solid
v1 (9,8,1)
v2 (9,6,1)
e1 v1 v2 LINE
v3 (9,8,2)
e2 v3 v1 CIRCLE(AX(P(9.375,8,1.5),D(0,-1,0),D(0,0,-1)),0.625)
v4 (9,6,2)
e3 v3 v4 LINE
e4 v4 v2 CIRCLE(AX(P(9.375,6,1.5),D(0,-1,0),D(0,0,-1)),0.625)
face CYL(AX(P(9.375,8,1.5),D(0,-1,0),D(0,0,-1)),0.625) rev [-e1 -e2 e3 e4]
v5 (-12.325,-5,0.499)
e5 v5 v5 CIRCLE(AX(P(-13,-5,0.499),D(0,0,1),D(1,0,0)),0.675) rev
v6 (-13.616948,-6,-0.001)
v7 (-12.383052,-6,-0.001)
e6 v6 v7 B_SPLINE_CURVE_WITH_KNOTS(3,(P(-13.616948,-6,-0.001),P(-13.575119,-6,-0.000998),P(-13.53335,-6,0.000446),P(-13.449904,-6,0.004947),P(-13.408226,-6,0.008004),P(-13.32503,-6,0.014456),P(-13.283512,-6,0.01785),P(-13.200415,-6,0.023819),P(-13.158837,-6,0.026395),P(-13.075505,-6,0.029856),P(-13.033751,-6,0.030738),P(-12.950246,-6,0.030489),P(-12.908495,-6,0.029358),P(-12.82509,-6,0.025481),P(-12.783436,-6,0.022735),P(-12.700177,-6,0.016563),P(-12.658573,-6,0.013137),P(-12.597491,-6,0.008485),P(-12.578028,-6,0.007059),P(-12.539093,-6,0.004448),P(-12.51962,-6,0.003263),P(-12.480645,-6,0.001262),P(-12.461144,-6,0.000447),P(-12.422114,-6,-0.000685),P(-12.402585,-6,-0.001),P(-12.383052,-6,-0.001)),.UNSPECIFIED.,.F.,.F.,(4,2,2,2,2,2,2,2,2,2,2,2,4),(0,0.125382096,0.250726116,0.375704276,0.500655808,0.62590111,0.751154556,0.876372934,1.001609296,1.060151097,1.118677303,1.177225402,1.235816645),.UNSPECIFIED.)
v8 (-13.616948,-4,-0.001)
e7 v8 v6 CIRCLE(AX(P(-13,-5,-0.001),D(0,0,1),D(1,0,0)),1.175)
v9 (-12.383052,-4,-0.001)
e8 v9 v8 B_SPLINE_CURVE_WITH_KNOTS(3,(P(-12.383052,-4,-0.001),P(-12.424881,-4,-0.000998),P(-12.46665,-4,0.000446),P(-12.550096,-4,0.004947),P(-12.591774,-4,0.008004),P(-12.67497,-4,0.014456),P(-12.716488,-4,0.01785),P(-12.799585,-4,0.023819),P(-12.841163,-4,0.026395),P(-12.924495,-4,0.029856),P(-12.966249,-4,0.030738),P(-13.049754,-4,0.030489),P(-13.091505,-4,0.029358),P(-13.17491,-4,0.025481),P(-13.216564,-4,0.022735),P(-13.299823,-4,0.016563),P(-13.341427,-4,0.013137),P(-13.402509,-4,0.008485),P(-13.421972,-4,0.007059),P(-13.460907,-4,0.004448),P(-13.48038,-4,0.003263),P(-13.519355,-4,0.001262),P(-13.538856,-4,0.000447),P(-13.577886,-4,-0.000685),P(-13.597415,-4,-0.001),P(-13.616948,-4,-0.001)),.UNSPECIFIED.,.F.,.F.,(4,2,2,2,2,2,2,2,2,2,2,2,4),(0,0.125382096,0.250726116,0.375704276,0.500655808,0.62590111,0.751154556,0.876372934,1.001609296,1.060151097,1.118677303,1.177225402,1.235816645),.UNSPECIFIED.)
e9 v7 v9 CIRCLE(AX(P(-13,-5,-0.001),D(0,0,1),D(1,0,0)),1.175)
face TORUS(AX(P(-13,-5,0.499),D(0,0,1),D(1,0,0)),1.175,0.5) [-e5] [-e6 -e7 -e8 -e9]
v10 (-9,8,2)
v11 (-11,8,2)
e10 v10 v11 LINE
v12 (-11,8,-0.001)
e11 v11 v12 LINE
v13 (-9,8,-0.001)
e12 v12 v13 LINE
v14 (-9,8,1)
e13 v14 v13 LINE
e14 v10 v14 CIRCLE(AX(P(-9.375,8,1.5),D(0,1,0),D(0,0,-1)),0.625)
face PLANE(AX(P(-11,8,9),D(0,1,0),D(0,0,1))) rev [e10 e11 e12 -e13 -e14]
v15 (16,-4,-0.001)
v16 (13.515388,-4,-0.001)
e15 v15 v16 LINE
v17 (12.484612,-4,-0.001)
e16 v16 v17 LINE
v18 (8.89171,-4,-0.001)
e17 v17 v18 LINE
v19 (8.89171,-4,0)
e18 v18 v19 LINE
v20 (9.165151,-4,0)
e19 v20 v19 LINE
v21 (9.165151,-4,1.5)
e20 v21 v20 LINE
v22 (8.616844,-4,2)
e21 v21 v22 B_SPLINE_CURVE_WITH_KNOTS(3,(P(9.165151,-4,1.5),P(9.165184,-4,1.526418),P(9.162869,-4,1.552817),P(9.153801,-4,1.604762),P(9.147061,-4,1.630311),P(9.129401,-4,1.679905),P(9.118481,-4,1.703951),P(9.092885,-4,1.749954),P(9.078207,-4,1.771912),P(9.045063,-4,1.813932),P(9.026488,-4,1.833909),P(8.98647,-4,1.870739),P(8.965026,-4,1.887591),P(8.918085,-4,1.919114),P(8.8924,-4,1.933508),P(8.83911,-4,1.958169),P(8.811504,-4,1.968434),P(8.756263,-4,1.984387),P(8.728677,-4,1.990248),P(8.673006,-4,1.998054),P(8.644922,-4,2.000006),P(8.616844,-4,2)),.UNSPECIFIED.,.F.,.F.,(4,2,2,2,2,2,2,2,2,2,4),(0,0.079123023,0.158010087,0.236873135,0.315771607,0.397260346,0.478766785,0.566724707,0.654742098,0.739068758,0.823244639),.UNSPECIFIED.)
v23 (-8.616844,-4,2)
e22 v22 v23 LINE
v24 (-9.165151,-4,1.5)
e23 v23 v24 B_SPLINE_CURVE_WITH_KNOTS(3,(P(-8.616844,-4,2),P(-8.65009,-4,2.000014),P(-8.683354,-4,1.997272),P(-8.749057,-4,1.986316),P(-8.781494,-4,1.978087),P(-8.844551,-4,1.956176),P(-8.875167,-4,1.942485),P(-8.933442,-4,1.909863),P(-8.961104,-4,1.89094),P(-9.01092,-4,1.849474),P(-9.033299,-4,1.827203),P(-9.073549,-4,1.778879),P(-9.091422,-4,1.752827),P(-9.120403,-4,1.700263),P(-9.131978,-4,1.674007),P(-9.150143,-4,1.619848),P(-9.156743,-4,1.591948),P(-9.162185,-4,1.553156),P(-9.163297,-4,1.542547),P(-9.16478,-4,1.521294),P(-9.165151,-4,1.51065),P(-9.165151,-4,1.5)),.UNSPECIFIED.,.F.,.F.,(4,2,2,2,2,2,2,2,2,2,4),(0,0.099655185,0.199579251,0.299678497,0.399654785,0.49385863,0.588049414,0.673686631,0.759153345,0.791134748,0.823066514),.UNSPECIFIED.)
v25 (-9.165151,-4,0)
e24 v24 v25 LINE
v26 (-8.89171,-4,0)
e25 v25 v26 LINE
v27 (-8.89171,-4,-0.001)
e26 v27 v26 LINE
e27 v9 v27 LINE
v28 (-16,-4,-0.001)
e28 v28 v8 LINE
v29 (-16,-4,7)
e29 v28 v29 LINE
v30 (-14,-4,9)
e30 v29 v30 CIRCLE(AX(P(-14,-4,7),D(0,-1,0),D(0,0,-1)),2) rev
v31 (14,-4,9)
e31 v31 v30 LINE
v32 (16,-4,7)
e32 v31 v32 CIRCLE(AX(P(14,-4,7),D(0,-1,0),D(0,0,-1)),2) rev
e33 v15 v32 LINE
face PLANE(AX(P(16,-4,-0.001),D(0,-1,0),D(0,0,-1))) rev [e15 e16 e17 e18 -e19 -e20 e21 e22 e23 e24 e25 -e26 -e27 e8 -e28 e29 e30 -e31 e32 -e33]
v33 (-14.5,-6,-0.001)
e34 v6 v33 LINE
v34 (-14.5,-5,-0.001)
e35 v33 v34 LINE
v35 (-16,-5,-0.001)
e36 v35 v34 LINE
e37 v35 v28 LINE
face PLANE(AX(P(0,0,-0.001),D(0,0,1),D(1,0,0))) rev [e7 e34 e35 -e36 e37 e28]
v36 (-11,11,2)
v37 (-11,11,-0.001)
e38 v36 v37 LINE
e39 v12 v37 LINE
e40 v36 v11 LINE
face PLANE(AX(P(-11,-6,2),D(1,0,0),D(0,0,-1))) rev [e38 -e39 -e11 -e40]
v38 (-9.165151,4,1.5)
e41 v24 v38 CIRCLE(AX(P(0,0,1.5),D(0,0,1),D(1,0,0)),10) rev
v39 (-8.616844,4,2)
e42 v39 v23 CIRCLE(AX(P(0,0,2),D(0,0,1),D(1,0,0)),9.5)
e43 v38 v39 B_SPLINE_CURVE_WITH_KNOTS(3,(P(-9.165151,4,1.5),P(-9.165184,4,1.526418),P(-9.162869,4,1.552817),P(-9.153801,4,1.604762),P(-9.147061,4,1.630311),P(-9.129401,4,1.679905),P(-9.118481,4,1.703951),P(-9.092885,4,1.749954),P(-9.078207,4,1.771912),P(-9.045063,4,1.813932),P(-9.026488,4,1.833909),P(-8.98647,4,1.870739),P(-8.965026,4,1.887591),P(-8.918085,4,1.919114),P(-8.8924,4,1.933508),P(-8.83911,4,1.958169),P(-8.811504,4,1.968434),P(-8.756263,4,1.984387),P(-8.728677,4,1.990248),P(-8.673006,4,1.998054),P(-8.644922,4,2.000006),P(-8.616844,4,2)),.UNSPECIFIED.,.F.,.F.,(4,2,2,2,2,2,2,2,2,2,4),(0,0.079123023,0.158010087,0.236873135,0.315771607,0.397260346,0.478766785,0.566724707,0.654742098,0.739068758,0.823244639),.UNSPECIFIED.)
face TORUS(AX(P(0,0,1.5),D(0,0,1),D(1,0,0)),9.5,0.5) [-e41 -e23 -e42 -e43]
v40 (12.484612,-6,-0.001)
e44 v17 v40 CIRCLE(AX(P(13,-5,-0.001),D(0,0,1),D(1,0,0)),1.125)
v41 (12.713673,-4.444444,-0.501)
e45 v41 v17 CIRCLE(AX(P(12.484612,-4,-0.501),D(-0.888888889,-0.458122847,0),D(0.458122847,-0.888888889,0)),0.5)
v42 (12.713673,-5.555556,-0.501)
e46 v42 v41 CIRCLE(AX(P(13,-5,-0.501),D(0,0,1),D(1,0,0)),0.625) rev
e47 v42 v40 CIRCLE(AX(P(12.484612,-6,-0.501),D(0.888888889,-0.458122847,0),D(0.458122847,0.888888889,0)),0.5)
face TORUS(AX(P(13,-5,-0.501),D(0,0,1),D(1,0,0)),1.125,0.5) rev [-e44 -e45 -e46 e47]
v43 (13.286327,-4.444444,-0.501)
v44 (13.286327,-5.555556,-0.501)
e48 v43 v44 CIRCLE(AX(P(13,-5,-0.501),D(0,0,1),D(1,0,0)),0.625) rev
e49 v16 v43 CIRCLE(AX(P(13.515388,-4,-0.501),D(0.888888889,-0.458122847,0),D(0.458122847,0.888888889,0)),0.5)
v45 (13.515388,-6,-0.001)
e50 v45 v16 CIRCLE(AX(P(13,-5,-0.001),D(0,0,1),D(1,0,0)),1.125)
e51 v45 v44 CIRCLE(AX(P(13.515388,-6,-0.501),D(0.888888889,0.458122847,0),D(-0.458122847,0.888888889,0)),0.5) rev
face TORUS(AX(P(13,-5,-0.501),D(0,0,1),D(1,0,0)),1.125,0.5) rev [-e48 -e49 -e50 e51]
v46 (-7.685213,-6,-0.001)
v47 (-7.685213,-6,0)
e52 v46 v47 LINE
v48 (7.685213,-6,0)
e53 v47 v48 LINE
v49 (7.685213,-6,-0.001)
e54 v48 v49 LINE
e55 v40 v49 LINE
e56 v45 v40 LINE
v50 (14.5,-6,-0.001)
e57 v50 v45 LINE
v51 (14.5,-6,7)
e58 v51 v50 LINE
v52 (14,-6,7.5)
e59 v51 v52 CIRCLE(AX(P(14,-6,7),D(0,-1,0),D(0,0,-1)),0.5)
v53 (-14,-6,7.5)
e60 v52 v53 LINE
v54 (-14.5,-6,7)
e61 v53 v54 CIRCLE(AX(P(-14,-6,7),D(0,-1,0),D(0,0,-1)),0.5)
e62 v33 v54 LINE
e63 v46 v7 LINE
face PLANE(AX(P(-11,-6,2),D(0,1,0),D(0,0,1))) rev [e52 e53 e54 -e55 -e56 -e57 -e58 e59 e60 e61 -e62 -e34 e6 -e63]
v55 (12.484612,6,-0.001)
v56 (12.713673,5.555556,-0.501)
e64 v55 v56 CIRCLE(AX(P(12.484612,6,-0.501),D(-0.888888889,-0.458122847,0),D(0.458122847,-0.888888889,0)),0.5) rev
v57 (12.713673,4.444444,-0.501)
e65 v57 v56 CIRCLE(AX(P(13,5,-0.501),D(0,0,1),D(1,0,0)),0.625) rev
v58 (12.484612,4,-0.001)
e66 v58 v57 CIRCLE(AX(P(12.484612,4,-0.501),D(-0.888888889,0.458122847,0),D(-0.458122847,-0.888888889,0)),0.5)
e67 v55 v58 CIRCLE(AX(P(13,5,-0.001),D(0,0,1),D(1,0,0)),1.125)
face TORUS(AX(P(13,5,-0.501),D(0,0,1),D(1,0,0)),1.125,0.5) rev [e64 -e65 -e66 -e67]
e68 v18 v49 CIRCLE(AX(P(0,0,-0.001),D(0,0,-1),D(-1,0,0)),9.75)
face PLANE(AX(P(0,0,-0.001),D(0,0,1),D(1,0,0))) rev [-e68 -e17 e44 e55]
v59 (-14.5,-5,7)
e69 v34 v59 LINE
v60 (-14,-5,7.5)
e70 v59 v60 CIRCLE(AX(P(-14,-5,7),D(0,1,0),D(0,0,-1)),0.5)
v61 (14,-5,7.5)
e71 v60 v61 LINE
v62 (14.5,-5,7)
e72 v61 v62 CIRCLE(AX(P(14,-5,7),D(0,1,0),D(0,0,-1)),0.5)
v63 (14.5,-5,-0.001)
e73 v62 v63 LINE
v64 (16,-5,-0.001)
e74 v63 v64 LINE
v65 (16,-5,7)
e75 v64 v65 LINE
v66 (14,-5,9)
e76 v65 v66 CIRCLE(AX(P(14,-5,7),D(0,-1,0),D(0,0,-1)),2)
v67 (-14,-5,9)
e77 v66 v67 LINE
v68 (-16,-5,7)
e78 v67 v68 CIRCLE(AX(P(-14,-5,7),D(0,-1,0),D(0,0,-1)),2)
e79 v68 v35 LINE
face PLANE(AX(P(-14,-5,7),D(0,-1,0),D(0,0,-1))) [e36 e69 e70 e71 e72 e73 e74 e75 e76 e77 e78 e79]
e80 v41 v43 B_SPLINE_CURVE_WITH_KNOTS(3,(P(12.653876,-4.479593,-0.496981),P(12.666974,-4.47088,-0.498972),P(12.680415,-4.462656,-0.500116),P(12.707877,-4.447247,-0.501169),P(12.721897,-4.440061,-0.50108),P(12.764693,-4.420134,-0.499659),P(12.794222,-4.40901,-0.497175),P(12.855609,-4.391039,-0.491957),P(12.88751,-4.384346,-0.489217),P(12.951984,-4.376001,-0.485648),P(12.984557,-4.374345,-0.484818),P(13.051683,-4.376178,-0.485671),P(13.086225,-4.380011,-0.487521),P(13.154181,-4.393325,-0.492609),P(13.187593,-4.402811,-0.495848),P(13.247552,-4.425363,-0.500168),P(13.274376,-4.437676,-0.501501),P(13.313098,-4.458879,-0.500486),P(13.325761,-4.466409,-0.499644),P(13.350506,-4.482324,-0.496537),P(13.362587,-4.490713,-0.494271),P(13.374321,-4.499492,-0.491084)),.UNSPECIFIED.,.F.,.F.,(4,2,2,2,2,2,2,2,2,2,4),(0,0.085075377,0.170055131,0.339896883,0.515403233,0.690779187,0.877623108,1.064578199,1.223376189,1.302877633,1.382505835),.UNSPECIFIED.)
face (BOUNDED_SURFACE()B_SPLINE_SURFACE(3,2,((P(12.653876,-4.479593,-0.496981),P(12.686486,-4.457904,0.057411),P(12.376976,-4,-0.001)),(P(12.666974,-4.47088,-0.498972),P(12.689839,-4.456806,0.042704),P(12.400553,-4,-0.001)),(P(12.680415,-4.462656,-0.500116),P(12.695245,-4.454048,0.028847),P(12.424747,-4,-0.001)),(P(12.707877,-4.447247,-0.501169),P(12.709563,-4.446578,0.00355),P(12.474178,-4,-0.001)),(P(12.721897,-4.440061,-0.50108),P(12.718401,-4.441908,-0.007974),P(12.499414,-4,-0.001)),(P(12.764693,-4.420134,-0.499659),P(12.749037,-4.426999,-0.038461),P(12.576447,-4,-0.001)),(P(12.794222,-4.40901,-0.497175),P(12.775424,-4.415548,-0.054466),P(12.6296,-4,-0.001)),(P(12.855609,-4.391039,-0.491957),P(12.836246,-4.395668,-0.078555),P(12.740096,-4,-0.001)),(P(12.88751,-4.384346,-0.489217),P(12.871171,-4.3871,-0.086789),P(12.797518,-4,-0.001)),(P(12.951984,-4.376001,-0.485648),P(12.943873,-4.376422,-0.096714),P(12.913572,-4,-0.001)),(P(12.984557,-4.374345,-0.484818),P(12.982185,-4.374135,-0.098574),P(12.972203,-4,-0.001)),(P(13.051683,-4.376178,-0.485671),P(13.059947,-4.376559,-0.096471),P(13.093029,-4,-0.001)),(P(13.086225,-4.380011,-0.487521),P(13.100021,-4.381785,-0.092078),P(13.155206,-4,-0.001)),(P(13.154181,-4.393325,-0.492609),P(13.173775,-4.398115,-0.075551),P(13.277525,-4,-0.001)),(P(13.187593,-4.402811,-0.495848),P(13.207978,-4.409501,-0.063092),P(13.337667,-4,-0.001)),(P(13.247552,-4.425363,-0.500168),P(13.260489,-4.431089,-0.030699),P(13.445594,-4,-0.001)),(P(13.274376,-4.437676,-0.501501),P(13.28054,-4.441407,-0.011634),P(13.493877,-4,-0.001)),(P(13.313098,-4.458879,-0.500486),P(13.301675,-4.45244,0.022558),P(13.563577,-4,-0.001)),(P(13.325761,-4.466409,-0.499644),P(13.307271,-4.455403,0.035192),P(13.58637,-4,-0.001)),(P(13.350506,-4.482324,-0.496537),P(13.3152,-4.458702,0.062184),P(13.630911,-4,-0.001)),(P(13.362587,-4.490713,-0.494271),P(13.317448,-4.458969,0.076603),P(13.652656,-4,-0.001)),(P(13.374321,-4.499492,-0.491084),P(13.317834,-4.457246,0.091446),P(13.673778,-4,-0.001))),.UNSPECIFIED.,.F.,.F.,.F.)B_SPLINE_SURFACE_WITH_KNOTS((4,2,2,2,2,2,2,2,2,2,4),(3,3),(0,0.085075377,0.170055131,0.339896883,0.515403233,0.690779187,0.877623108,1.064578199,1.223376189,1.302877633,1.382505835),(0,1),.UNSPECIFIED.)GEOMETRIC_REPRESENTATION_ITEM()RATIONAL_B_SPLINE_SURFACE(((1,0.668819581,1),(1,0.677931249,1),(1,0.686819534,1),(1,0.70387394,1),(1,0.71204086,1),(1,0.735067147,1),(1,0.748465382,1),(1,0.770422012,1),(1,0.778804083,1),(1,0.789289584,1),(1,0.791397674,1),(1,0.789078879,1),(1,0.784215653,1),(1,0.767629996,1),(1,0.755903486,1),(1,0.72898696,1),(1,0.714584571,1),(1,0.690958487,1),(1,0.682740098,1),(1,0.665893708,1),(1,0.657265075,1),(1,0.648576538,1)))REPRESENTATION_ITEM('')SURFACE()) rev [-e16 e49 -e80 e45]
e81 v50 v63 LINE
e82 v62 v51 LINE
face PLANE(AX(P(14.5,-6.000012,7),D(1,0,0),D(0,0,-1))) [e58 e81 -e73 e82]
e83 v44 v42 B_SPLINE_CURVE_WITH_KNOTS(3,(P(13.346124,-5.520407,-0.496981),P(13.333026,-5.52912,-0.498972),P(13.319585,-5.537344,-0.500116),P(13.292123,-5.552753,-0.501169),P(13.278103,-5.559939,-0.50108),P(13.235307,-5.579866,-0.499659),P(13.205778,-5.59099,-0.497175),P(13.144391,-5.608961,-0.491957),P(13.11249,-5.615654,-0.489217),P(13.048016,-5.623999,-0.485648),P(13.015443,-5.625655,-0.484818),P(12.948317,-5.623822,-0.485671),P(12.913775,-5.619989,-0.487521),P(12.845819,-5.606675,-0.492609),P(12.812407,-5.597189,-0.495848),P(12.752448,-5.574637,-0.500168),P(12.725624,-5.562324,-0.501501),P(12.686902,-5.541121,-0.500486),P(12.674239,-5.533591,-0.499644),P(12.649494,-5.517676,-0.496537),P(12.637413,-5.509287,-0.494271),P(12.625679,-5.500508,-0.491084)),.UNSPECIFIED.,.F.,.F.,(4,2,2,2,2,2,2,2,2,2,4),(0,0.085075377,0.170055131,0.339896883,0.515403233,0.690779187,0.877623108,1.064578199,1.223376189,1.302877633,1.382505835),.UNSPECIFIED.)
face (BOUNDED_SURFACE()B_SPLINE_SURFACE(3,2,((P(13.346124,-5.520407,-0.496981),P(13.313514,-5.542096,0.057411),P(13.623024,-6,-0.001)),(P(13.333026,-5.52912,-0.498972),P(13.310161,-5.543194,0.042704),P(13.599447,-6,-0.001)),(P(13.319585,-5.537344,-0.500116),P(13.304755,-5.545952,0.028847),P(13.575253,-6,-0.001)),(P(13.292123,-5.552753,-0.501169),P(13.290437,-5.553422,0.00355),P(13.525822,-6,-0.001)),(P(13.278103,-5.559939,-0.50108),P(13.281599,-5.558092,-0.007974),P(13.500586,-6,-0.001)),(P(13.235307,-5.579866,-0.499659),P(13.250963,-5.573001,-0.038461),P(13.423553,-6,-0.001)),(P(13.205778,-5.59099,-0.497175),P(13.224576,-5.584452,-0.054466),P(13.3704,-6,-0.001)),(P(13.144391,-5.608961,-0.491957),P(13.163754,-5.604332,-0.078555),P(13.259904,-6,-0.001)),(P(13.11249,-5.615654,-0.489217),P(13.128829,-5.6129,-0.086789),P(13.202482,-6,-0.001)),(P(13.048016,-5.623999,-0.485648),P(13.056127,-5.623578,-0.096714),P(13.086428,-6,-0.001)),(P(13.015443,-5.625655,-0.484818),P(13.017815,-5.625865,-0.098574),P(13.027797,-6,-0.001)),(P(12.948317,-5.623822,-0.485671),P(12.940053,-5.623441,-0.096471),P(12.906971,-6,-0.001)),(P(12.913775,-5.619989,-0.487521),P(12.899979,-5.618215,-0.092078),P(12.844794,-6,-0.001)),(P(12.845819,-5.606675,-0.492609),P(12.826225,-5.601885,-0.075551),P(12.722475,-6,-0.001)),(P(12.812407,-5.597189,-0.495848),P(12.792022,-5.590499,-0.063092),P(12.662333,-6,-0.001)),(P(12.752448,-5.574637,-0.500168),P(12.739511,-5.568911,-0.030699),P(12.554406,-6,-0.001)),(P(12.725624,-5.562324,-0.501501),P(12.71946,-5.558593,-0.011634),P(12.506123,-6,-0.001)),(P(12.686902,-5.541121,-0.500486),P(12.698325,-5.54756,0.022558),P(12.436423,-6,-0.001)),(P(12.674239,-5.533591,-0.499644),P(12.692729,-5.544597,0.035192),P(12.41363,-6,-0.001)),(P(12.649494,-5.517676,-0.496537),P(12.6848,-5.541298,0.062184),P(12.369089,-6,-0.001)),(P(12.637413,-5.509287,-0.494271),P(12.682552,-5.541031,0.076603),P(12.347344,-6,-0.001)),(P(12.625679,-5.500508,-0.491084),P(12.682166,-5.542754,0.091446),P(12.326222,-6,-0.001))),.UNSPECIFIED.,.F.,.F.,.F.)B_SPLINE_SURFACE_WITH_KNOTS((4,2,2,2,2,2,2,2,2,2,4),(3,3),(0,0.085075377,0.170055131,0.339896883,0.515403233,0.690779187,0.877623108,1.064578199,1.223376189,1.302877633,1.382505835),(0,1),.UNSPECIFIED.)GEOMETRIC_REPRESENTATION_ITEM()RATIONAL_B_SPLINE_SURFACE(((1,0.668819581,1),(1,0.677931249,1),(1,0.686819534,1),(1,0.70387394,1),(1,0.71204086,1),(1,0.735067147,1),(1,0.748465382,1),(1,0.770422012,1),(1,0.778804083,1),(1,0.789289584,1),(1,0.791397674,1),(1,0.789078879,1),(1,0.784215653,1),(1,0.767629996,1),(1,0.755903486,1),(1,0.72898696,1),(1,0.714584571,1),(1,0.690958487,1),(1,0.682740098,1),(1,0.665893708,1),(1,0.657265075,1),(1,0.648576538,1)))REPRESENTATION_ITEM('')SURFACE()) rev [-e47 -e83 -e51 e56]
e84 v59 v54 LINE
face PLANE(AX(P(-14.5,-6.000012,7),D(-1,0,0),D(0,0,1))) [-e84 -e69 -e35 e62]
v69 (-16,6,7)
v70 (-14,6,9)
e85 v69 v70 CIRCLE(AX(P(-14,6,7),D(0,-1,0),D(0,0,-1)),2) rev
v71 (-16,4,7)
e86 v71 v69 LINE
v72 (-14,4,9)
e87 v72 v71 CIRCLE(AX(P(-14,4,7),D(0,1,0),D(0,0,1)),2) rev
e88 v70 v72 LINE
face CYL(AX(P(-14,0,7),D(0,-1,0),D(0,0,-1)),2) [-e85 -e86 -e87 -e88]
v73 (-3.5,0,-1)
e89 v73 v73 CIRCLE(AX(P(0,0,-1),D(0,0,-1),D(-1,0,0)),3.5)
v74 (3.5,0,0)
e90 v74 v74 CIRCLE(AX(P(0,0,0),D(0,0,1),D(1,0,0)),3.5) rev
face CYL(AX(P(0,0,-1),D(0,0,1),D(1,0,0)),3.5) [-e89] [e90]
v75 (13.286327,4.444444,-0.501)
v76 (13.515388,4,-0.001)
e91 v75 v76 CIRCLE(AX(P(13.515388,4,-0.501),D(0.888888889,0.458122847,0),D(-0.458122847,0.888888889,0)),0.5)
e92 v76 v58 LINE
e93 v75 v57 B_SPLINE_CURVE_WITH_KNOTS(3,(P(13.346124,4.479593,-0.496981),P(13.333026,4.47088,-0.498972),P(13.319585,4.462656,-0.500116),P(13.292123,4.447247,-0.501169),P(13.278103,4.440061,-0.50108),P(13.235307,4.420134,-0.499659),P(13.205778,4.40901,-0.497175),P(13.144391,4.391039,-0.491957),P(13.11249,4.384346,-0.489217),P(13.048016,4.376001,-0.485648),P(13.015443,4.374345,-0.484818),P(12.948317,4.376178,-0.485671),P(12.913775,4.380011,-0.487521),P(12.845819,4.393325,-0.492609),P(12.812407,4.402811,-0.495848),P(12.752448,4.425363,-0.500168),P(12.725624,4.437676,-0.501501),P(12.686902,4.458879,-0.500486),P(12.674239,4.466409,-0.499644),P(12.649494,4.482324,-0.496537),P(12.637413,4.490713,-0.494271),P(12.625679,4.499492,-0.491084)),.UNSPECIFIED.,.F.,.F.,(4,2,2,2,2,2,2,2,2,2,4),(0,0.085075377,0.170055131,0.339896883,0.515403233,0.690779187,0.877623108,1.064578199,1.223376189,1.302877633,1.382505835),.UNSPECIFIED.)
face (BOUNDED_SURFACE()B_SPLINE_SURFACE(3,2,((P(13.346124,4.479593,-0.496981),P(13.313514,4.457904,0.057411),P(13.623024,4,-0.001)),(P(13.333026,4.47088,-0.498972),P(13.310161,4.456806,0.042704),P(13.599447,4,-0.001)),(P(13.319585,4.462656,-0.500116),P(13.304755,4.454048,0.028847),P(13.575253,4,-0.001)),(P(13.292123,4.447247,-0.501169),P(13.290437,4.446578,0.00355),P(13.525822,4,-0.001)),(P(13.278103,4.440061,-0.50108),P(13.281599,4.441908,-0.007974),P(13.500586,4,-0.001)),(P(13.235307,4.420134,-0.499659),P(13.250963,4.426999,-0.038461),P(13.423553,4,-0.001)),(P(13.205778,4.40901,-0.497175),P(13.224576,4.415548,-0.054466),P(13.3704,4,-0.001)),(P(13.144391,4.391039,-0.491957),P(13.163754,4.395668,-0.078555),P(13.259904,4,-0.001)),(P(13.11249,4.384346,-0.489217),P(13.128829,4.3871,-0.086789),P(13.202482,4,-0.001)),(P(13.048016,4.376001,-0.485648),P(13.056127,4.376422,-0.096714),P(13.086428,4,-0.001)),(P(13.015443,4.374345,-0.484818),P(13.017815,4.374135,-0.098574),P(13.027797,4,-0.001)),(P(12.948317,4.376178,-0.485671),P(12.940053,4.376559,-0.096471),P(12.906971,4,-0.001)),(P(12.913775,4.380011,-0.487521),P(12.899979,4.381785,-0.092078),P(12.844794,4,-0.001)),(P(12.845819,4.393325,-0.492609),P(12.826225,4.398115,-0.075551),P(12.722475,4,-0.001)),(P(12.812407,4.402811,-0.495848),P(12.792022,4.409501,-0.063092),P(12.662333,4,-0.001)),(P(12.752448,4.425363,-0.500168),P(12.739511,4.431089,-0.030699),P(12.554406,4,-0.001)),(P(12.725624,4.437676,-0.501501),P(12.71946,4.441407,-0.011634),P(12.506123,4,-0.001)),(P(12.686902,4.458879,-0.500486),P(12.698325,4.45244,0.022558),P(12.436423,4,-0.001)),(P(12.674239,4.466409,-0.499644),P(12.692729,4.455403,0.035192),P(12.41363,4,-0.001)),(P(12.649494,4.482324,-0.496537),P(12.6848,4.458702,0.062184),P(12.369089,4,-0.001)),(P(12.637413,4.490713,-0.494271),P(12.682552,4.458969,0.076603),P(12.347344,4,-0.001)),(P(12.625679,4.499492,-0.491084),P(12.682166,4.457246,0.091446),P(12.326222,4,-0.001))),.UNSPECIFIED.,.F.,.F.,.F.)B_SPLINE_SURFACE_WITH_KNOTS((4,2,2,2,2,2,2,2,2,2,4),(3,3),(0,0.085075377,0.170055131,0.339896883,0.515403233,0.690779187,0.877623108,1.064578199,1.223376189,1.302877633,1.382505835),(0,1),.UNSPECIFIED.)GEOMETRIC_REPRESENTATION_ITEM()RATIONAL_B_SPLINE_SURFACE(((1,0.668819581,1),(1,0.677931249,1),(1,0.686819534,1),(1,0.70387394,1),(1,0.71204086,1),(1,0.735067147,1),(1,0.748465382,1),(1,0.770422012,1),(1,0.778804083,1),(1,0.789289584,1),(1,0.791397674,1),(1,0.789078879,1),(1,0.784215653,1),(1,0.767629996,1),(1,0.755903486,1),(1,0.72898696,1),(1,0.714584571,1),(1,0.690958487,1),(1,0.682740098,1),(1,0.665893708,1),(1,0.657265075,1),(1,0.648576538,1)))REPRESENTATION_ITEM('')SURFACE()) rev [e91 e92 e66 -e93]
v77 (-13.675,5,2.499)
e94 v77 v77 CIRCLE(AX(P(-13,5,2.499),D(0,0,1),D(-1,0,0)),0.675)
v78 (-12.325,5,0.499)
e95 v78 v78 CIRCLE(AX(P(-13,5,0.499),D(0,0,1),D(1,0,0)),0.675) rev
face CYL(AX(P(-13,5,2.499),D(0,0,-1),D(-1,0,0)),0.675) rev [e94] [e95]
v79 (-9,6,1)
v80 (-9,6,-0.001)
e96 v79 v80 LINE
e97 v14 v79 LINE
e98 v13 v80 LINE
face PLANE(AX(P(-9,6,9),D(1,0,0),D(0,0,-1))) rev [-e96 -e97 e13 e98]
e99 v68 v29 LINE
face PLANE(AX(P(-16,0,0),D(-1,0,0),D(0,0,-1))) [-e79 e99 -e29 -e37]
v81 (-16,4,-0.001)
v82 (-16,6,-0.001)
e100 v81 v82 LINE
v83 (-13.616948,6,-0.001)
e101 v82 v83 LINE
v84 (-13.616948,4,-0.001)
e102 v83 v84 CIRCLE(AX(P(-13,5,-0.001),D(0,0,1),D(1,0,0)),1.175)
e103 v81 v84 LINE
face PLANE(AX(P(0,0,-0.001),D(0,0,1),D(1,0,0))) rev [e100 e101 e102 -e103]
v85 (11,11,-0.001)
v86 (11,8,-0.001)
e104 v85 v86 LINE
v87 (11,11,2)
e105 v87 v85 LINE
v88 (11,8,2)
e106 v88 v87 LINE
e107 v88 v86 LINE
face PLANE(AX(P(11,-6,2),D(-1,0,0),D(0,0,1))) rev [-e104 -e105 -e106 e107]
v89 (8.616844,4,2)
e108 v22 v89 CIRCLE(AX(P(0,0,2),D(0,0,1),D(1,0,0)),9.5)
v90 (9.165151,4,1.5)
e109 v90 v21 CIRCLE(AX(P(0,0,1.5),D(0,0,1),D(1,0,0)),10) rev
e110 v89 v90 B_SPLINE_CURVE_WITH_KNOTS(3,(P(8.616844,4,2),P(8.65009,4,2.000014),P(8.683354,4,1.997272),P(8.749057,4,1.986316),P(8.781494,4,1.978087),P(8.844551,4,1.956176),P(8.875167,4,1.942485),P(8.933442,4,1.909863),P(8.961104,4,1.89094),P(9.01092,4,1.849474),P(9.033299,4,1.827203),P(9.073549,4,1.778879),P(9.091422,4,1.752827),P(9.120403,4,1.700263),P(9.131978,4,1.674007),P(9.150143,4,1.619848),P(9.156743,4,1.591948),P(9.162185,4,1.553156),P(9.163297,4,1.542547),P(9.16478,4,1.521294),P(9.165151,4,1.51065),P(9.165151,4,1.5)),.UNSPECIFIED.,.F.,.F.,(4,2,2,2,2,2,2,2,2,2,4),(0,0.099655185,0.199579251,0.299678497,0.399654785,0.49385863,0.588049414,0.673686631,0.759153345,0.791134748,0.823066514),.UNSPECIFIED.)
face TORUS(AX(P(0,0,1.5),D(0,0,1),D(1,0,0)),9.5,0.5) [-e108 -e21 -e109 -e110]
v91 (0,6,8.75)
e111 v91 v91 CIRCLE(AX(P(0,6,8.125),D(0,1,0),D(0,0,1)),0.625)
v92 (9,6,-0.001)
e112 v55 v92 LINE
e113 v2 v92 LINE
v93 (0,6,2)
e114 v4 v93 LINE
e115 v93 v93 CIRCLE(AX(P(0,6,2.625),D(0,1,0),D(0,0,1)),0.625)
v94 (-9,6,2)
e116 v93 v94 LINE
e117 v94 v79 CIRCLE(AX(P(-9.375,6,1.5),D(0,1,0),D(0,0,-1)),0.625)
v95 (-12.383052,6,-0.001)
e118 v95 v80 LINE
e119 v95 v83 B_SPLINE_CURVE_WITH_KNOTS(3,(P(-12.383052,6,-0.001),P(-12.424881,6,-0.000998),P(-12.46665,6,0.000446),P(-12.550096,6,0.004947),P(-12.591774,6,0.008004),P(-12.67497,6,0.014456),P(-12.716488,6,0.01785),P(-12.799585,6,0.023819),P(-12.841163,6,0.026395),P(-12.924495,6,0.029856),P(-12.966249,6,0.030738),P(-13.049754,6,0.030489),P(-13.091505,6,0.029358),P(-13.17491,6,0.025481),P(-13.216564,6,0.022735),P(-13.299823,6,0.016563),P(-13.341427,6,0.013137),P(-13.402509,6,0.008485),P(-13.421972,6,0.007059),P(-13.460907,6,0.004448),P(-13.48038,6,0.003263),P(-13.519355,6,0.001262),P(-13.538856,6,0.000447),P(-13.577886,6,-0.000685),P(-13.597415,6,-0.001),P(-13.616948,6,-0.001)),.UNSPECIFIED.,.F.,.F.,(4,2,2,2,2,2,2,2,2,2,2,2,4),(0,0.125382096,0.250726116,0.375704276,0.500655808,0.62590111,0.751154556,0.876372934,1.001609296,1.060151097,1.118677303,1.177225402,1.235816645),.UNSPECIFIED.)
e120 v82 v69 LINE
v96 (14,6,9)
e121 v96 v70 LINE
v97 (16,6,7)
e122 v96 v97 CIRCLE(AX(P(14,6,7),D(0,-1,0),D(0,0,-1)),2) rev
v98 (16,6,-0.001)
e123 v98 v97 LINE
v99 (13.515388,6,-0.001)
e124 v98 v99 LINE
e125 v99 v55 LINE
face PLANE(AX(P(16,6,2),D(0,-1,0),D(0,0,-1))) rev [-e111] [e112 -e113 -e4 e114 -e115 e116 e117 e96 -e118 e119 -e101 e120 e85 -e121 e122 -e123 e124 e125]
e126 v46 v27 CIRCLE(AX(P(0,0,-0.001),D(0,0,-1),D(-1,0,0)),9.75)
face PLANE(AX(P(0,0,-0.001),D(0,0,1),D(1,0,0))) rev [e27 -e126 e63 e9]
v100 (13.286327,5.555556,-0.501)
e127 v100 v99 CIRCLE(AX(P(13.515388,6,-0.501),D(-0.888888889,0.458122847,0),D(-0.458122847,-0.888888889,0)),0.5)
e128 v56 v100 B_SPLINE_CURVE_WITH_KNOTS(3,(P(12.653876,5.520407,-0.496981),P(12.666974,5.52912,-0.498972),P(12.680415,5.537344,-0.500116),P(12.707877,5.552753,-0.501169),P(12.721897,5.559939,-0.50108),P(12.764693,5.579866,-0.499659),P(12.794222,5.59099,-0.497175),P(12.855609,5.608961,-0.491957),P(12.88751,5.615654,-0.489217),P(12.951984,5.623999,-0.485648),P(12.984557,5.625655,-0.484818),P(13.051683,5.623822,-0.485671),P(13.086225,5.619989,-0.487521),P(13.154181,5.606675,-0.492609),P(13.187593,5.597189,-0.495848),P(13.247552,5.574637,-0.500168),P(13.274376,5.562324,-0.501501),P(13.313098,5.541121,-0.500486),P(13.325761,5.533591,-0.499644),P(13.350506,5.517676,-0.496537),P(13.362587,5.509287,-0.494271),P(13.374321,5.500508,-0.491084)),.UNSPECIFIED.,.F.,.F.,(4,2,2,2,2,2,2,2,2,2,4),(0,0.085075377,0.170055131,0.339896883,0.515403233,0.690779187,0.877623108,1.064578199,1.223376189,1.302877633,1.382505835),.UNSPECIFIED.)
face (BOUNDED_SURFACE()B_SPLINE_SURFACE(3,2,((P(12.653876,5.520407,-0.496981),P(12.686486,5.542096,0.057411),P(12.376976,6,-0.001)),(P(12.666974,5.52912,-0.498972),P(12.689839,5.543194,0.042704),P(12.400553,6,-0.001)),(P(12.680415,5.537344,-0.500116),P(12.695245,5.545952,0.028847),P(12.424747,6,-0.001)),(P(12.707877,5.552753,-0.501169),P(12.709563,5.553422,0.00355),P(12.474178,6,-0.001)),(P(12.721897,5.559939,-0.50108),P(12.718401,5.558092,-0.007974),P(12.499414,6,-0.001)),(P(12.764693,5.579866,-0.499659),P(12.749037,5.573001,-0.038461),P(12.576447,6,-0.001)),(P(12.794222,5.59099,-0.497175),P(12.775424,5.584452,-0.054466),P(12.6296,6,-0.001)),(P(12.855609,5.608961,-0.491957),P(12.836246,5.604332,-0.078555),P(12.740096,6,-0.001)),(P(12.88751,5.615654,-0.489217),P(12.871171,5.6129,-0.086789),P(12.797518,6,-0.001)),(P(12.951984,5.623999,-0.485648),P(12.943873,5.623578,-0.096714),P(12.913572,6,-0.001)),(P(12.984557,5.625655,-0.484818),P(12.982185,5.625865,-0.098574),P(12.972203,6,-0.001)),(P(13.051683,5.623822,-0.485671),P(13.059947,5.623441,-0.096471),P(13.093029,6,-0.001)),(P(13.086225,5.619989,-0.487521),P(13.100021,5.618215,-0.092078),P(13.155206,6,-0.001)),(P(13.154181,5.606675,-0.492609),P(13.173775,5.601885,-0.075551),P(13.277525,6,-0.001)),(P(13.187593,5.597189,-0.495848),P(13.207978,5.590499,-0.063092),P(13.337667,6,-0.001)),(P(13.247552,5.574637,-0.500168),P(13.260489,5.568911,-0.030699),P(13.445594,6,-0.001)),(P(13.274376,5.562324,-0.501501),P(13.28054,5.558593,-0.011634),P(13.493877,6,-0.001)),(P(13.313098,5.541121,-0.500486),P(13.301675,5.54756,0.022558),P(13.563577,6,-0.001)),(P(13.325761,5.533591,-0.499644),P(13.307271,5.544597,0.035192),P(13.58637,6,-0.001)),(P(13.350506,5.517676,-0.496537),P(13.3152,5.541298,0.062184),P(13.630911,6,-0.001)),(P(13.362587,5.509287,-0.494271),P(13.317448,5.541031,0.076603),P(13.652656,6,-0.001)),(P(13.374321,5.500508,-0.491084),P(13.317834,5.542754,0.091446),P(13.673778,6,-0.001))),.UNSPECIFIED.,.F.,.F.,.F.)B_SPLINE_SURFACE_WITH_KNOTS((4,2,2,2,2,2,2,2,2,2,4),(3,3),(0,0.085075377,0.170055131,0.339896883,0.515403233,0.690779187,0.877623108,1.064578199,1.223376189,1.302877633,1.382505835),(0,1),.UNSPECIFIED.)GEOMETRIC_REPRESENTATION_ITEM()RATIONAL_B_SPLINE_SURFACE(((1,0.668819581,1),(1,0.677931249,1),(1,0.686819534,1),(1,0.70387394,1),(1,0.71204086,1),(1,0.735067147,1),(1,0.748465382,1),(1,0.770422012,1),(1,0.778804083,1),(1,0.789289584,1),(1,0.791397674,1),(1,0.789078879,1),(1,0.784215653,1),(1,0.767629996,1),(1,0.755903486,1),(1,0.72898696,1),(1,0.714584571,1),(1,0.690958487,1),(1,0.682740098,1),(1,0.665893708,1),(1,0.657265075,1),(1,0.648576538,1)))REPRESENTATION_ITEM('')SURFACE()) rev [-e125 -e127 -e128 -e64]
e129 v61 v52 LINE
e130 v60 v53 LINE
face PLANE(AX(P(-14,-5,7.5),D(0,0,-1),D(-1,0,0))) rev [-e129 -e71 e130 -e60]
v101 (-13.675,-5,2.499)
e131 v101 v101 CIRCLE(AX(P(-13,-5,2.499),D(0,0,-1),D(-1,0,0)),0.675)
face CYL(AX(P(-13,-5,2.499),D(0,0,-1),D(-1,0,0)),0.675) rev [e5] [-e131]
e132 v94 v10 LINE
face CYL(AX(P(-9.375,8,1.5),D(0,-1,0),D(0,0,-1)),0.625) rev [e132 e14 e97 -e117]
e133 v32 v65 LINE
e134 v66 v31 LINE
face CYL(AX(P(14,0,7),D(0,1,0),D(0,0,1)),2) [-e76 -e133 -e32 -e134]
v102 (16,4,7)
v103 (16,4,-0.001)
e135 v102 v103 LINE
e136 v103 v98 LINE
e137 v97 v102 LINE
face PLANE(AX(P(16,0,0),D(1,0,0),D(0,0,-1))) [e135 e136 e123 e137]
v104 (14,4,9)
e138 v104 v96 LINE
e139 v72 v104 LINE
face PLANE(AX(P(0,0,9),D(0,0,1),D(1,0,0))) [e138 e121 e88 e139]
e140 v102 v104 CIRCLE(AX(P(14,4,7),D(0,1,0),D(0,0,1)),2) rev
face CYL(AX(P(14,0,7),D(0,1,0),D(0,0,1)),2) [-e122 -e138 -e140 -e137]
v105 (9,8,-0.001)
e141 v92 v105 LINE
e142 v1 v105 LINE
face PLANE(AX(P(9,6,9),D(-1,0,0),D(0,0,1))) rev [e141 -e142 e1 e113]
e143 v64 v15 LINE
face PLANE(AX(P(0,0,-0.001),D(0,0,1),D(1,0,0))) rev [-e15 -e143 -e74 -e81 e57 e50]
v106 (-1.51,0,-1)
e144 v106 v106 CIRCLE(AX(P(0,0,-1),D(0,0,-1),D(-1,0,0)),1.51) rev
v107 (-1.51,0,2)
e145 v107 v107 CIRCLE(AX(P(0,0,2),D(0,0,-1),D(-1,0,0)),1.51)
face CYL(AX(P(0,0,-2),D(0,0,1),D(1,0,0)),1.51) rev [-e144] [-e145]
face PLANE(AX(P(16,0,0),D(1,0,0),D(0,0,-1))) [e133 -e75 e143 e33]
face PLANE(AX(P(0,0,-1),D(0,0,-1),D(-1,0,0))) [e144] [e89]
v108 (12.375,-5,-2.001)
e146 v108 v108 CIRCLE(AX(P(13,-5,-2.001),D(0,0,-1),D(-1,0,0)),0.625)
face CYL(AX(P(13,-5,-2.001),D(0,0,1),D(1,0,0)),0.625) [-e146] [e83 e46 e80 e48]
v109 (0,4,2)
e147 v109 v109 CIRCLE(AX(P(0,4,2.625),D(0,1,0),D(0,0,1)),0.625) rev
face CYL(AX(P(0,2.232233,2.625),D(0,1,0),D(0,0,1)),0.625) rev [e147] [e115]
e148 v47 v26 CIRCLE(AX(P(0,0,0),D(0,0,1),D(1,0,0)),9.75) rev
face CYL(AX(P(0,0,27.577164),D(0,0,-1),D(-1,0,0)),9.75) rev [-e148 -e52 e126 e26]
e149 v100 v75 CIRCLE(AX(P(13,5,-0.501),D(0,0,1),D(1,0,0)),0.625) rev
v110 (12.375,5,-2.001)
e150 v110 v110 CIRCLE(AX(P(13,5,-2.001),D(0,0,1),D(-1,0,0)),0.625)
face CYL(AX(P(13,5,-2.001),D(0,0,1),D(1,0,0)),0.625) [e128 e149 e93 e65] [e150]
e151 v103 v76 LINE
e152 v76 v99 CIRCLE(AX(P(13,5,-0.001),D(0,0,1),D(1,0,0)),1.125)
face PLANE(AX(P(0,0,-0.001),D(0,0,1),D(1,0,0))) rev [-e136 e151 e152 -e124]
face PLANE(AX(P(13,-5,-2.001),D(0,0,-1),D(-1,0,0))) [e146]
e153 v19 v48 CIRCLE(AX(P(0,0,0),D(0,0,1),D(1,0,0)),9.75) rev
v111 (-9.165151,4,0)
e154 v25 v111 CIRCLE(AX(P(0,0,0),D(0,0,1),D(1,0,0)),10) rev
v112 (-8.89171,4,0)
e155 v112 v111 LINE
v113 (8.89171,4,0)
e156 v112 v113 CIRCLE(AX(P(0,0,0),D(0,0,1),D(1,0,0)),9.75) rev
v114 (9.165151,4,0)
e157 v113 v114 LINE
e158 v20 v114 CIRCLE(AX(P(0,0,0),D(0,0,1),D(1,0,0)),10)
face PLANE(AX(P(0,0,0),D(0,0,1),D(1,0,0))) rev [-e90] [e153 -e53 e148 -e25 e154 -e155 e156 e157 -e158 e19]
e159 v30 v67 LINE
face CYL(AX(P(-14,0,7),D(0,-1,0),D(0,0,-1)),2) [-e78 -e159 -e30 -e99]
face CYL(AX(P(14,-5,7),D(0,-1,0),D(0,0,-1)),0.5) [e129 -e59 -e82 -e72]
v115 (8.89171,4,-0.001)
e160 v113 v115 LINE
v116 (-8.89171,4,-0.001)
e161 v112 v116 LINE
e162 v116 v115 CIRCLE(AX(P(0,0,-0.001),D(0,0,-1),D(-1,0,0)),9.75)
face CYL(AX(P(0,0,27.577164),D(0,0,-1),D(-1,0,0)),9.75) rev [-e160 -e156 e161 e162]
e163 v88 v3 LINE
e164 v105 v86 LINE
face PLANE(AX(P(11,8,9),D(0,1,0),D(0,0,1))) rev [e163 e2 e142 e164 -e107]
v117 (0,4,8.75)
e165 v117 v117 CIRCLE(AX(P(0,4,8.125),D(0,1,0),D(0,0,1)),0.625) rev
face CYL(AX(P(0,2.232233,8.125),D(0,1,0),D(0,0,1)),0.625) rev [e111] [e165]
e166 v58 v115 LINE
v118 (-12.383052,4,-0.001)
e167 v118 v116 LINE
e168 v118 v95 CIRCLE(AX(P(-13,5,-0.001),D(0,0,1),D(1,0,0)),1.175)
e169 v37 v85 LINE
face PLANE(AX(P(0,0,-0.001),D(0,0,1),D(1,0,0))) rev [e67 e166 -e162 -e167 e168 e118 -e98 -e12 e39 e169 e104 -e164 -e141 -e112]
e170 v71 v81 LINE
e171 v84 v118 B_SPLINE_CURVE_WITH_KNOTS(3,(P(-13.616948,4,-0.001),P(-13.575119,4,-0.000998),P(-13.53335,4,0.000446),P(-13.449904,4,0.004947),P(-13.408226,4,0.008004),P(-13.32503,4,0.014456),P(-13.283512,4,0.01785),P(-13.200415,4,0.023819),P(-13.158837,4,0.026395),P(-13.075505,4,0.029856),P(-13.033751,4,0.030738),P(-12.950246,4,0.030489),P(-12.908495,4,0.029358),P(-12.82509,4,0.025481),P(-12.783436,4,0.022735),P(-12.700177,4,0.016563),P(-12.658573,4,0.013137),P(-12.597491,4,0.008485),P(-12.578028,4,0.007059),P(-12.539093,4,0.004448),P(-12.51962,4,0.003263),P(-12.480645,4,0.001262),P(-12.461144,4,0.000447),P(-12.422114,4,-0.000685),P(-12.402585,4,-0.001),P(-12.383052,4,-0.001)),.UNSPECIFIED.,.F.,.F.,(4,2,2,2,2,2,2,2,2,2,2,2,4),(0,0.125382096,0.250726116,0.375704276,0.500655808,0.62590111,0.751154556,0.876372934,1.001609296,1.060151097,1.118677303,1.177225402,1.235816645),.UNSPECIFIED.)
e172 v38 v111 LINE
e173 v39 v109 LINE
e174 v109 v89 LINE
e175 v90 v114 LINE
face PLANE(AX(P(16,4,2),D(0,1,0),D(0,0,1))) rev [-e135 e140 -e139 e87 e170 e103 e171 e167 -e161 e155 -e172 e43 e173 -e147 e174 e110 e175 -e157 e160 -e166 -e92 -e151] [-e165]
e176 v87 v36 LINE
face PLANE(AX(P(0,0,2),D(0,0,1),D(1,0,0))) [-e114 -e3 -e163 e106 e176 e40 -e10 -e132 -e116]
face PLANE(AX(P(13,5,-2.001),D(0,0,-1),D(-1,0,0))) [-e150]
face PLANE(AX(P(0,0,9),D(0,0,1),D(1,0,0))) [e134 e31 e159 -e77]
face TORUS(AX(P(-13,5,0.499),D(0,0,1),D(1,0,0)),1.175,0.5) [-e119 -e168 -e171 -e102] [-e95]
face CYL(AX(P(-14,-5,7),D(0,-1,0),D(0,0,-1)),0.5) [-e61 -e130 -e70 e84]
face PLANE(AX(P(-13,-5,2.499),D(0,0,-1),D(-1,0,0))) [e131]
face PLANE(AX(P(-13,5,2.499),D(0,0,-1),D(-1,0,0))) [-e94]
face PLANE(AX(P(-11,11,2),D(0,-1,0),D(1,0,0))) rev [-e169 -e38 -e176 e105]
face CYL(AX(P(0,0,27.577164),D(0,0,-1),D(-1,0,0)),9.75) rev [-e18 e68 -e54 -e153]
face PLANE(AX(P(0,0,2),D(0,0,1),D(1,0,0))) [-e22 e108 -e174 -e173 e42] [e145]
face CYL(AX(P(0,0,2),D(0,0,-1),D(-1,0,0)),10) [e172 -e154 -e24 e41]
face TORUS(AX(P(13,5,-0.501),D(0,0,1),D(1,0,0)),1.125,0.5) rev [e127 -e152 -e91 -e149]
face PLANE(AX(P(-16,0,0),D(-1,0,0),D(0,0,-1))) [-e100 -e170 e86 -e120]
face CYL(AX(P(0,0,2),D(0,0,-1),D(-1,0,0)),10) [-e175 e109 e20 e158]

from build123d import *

# Parameters (mm, degrees)
BOSS_EXTRUDE1_DEPTH     = 2
SKETCH2_R               = 1.51
BOSS_EXTRUDE2_DEPTH     = 4
SKETCH3_R               = 3.5
BOSS_EXTRUDE3_DEPTH     = 1
SKETCH4_W               = 2
SKETCH4_H               = 17
BOSS_EXTRUDE4_DEPTH     = 0.001
SKETCH5_W               = 18
SKETCH5_H               = 2
BOSS_EXTRUDE5_DEPTH     = 0.001
SKETCH6_W               = 2.001
SKETCH6_H               = 2
BOSS_EXTRUDE6_DEPTH     = 5
BOSS_EXTRUDE7_DEPTH     = 0.001
CUT_EXTRUDE1_DEPTH      = 20.519323784
SKETCH9_W               = 2.937742252
SKETCH9_H               = 8
CUT_EXTRUDE2_DEPTH      = 0.001
CUT_EXTRUDE11_START     = -0.001
SKETCH21_R              = 9.75
SKETCH21_R_2            = 3.5
CUT_EXTRUDE11_DEPTH     = 0.001
SKETCH10_W              = 32
SKETCH10_H              = 2
BOSS_EXTRUDE8_DEPTH     = 7
FILLET1_R               = 0.5
SKETCH11_R              = 0.625
BOSS_EXTRUDE9_DEPTH     = 2
SKETCH14_W              = 2
SKETCH14_H              = 2
CUT_EXTRUDE5_DEPTH      = 22.401355237
SKETCH12_R              = 0.675
CUT_EXTRUDE3_DEPTH      = 2.5
CUT_EXTRUDE6_DEPTH      = 2
FILLET2_R               = 0.5
FILLET3_R               = 0.5
FILLET4_R               = 2
CUT_EXTRUDE7_DEPTH      = 26.019992106
CUT_EXTRUDE7_DEPTH_BACK = 1
SKETCH19_R              = 0.625
CUT_EXTRUDE9_DEPTH      = 2


with BuildPart() as part:
    # Sketch1 → Boss-Extrude1 (new body)
    with BuildSketch(Plane.XY):
        Polygon((-11, 6), (-11, 11), (11, 11), (11, 6), (11, -6), (-11, -6), align=None)
    extrude(amount=BOSS_EXTRUDE1_DEPTH)

    # Sketch3 → Boss-Extrude3 (add)
    with BuildSketch(Plane(origin=(0, 0, 0), x_dir=(-1, 0, 0), z_dir=(0, 0, -1))):
        with Locations(Location((0, 0, 0), (0, 0, 180))):
            Circle(SKETCH3_R)
    extrude(amount=BOSS_EXTRUDE3_DEPTH)

    # Sketch4 → Boss-Extrude4 (add)
    with BuildSketch(Plane(origin=(0, 0, 0), x_dir=(-1, 0, 0), z_dir=(0, 0, -1))):
        with Locations((10, 2.5)):
            Rectangle(SKETCH4_W, SKETCH4_H)
        with Locations((-10, 2.5)):
            Rectangle(SKETCH4_W, SKETCH4_H)
    extrude(amount=BOSS_EXTRUDE4_DEPTH)

    # Sketch5 → Boss-Extrude5 (add)
    with BuildSketch(Plane(origin=(0, 0, 0), x_dir=(-1, 0, 0), z_dir=(0, 0, -1))):
        with Locations((0, 10)):
            Rectangle(SKETCH5_W, SKETCH5_H)
    extrude(amount=BOSS_EXTRUDE5_DEPTH)

    # Sketch6 → Boss-Extrude6 (add)
    with BuildSketch(Plane(origin=(11, 0, 0), x_dir=(0, 0, -1), z_dir=(1, 0, 0))):
        with Locations((-0.9995, -5)):
            Rectangle(SKETCH6_W, SKETCH6_H)
        with Locations((-0.9995, 5)):
            Rectangle(SKETCH6_W, SKETCH6_H)
    boss_extrude6 = extrude(amount=BOSS_EXTRUDE6_DEPTH)

    # Mirror1: Boss-Extrude6 across plane
    add(boss_extrude6.mirror(Plane(origin=(0, 0, 0), x_dir=(0, 0, 1), z_dir=(1, 0, 0))))

    # Sketch7 → Boss-Extrude7 (add)
    with BuildSketch(Plane(origin=(0, 0, -0.001), x_dir=(-1, 0, 0), z_dir=(0, 0, -1))):
        with BuildLine():
            ThreePointArc((-6.708203932, -6), (-8.407551231, -3.211398808), (-9, 0))
            Line((-9, 0), (-9, -6))
            Line((-9, -6), (-6.708203932, -6))
        make_face()
        with BuildLine():
            Line((-9, 9), (-9, 0))
            ThreePointArc((-9, 0), (-6.363961031, 6.363961031), (0, 9))
            Line((0, 9), (-9, 9))
        make_face()
    boss_extrude7 = extrude(amount=-BOSS_EXTRUDE7_DEPTH)

    # Sketch8 → Cut-Extrude1 (cut, through all)
    with BuildSketch(Plane(origin=(0, 0, -0.001), x_dir=(-1, 0, 0), z_dir=(0, 0, -1))):
        with BuildLine():
            Line((-11, 4), (-9.16515139, 4))
            ThreePointArc((-9.16515139, 4), (-10, 0), (-9.16515139, -4))
            Line((-9.16515139, -4), (-11, -4))
            Line((-11, -4), (-11, 4))
        make_face()
    cut_extrude1 = extrude(amount=-CUT_EXTRUDE1_DEPTH, mode=Mode.SUBTRACT)

    # Sketch9 → Cut-Extrude2 (cut)
    with BuildSketch(Plane(origin=(0, 0, -0.001), x_dir=(-1, 0, 0), z_dir=(0, 0, -1))):
        with Locations((-9.531128874, 0)):
            Rectangle(SKETCH9_W, SKETCH9_H)
    cut_extrude2 = extrude(amount=-CUT_EXTRUDE2_DEPTH, mode=Mode.SUBTRACT)

    # Mirror2: Boss-Extrude7, Cut-Extrude1, Cut-Extrude2 across plane
    add(boss_extrude7.mirror(Plane(origin=(0, 0, 0), x_dir=(0, 0, 1), z_dir=(1, 0, 0))))
    add(cut_extrude1.mirror(Plane(origin=(0, 0, 0), x_dir=(0, 0, 1), z_dir=(1, 0, 0))), mode=Mode.SUBTRACT)
    add(cut_extrude2.mirror(Plane(origin=(0, 0, 0), x_dir=(0, 0, 1), z_dir=(1, 0, 0))), mode=Mode.SUBTRACT)

    # Sketch21 → Cut-Extrude11 (cut)
    with BuildSketch(Plane(origin=(0, 0, -0.001), x_dir=(-1, 0, 0), z_dir=(0, 0, -1)).offset(CUT_EXTRUDE11_START)):
        Circle(SKETCH21_R)
        with Locations(Location((0, 0, 0), (0, 0, 180))):
            Circle(SKETCH21_R_2, mode=Mode.SUBTRACT)
    extrude(amount=CUT_EXTRUDE11_DEPTH, mode=Mode.SUBTRACT)

    # Sketch10 → Boss-Extrude8 (add)
    with BuildSketch(Plane.XY.offset(2)):
        with Locations((0, -5)):
            Rectangle(SKETCH10_W, SKETCH10_H)
        with Locations((0, 5)):
            Rectangle(SKETCH10_W, SKETCH10_H)
    extrude(amount=BOSS_EXTRUDE8_DEPTH)

    # Fillet1
    fillet1_edges = [part.edges().sort_by_distance(p)[0] for p in [
        (10, 0, 2),
        (-10, 0, 2),
    ]]
    fillet(fillet1_edges, radius=FILLET1_R)

    # Sketch11 → Boss-Extrude9 (add)
    with BuildSketch(Plane(origin=(0, 0, -0.001), x_dir=(-1, 0, 0), z_dir=(0, 0, -1))):
        with Locations(Location((-13, -5, 0), (0, 0, 180))):
            Circle(SKETCH11_R)
    boss_extrude9 = extrude(amount=BOSS_EXTRUDE9_DEPTH)

    # Sketch14 → Cut-Extrude5 (cut, through all)
    with BuildSketch(Plane(origin=(0, 0, -0.001), x_dir=(-1, 0, 0), z_dir=(0, 0, -1))):
        with Locations((10, 7)):
            Rectangle(SKETCH14_W, SKETCH14_H)
        with Locations((-10, 7)):
            Rectangle(SKETCH14_W, SKETCH14_H)
    extrude(amount=-CUT_EXTRUDE5_DEPTH, mode=Mode.SUBTRACT)

    # Sketch12 → Cut-Extrude3 (cut)
    with BuildSketch(Plane(origin=(0, 0, -0.001), x_dir=(-1, 0, 0), z_dir=(0, 0, -1))):
        with Locations((13, -5)):
            Circle(SKETCH12_R)
    cut_extrude3 = extrude(amount=-CUT_EXTRUDE3_DEPTH, mode=Mode.SUBTRACT)

    # Sketch16 → Cut-Extrude6 (cut)
    with BuildSketch(Plane(origin=(0, 6, 0), x_dir=(1, 0, 0), z_dir=(0, 1, 0))):
        with BuildLine():
            Line((-9, -1), (-9, -2))
            ThreePointArc((-9, -2), (-8.75, -1.5), (-9, -1))
        make_face()
    cut_extrude6 = extrude(amount=CUT_EXTRUDE6_DEPTH, mode=Mode.SUBTRACT)

    # Mirror3: Boss-Extrude9, Cut-Extrude3 across plane
    add(boss_extrude9.mirror(Plane.ZX))
    add(cut_extrude3.mirror(Plane.ZX), mode=Mode.SUBTRACT)

    # Mirror4: Cut-Extrude6 across plane
    add(cut_extrude6.mirror(Plane(origin=(0, 0, 0), x_dir=(0, 0, 1), z_dir=(1, 0, 0))), mode=Mode.SUBTRACT)

    # Fillet2
    fillet2_edges = [part.edges().sort_by_distance(p)[0] for p in [
        (12.375, -5, -0.001),
        (12.375, 5, -0.001),
    ]]
    fillet(fillet2_edges, radius=FILLET2_R)

    # Fillet3
    # the kernel refuses this fillet: 0.5 mm, written as the material it takes off along each edge
    with BuildSketch(Plane(origin=(-13, -5, -0.001), x_dir=(-1, 0, 0), z_dir=(0, -1, 0))) as fillet3_piece_1:
        with BuildLine():
            CenterArc((0.675 + FILLET3_R, -FILLET3_R), FILLET3_R, 90, 90)
            Line((0.675, -FILLET3_R), (0.675, 0))
            Line((0.675, 0), (0.675 + FILLET3_R, 0))
        make_face()
    revolve(axis=Axis((-13, -5, -0.001), (0, 0, -1)), mode=Mode.SUBTRACT)
    with BuildSketch(Plane(origin=(-13, 5, -0.001), x_dir=(-1, 0, 0), z_dir=(0, 1, 0))) as fillet3_piece_2:
        with BuildLine():
            CenterArc((0.675 + FILLET3_R, FILLET3_R), FILLET3_R, 180, 90)
            Line((0.675, FILLET3_R), (0.675, 0))
            Line((0.675, 0), (0.675 + FILLET3_R, 0))
        make_face()
    revolve(axis=Axis((-13, 5, -0.001), (0, 0, 1)), mode=Mode.SUBTRACT)

    # Fillet4
    fillet4_edges = [part.edges().sort_by_distance(p)[0] for p in [
        (16, -5, 9),
        (-16, -5, 9),
        (-16, 5, 9),
        (16, 5, 9),
    ]]
    fillet(fillet4_edges, radius=FILLET4_R)

    # Sketch17 → Cut-Extrude7 (cut, two sides: drawn at the far end of the back side and taken through both)
    with BuildSketch(Plane.XZ.offset(6).offset(-CUT_EXTRUDE7_DEPTH_BACK)):
        with BuildLine():
            Line((-16, 7), (-16, -0.001))
            Line((-16, -0.001), (-14.5, -0.001))
            Line((-14.5, -0.001), (-14.5, 7))
            ThreePointArc((-14.5, 7), (-14.353553391, 7.353553391), (-14, 7.5))
            Line((-14, 7.5), (14, 7.5))
            ThreePointArc((14, 7.5), (14.353553391, 7.353553391), (14.5, 7))
            Line((14.5, 7), (14.5, -0.001))
            Line((14.5, -0.001), (16, -0.001))
            Line((16, -0.001), (16, 7))
            ThreePointArc((16, 7), (15.414213562, 8.414213562), (14, 9))
            Line((14, 9), (-14, 9))
            ThreePointArc((-14, 9), (-15.414213562, 8.414213562), (-16, 7))
        make_face()
    extrude(amount=CUT_EXTRUDE7_DEPTH + CUT_EXTRUDE7_DEPTH_BACK, mode=Mode.SUBTRACT)

    # Sketch19 → Cut-Extrude9 (cut)
    with BuildSketch(Plane(origin=(0, 6, 0), x_dir=(1, 0, 0), z_dir=(0, 1, 0))):
        with Locations(Location((0, -2.625, 0), (0, 0, 90))):
            Circle(SKETCH19_R)
        with Locations(Location((0, -8.125, 0), (0, 0, 270))):
            Circle(SKETCH19_R)
    extrude(amount=-CUT_EXTRUDE9_DEPTH, mode=Mode.SUBTRACT)


with BuildPart() as body_2:
    # Sketch2 → Boss-Extrude2 (new body)
    with BuildSketch(Plane(origin=(0, 0, 2), x_dir=(-1, 0, 0), z_dir=(0, 0, -1))):
        Circle(SKETCH2_R)
    extrude(amount=BOSS_EXTRUDE2_DEPTH)


with BuildPart() as part_1:
    add(part.part)

    # Combine2: cut body 2
    add(body_2.part, mode=Mode.SUBTRACT)


solid = part_1.part
